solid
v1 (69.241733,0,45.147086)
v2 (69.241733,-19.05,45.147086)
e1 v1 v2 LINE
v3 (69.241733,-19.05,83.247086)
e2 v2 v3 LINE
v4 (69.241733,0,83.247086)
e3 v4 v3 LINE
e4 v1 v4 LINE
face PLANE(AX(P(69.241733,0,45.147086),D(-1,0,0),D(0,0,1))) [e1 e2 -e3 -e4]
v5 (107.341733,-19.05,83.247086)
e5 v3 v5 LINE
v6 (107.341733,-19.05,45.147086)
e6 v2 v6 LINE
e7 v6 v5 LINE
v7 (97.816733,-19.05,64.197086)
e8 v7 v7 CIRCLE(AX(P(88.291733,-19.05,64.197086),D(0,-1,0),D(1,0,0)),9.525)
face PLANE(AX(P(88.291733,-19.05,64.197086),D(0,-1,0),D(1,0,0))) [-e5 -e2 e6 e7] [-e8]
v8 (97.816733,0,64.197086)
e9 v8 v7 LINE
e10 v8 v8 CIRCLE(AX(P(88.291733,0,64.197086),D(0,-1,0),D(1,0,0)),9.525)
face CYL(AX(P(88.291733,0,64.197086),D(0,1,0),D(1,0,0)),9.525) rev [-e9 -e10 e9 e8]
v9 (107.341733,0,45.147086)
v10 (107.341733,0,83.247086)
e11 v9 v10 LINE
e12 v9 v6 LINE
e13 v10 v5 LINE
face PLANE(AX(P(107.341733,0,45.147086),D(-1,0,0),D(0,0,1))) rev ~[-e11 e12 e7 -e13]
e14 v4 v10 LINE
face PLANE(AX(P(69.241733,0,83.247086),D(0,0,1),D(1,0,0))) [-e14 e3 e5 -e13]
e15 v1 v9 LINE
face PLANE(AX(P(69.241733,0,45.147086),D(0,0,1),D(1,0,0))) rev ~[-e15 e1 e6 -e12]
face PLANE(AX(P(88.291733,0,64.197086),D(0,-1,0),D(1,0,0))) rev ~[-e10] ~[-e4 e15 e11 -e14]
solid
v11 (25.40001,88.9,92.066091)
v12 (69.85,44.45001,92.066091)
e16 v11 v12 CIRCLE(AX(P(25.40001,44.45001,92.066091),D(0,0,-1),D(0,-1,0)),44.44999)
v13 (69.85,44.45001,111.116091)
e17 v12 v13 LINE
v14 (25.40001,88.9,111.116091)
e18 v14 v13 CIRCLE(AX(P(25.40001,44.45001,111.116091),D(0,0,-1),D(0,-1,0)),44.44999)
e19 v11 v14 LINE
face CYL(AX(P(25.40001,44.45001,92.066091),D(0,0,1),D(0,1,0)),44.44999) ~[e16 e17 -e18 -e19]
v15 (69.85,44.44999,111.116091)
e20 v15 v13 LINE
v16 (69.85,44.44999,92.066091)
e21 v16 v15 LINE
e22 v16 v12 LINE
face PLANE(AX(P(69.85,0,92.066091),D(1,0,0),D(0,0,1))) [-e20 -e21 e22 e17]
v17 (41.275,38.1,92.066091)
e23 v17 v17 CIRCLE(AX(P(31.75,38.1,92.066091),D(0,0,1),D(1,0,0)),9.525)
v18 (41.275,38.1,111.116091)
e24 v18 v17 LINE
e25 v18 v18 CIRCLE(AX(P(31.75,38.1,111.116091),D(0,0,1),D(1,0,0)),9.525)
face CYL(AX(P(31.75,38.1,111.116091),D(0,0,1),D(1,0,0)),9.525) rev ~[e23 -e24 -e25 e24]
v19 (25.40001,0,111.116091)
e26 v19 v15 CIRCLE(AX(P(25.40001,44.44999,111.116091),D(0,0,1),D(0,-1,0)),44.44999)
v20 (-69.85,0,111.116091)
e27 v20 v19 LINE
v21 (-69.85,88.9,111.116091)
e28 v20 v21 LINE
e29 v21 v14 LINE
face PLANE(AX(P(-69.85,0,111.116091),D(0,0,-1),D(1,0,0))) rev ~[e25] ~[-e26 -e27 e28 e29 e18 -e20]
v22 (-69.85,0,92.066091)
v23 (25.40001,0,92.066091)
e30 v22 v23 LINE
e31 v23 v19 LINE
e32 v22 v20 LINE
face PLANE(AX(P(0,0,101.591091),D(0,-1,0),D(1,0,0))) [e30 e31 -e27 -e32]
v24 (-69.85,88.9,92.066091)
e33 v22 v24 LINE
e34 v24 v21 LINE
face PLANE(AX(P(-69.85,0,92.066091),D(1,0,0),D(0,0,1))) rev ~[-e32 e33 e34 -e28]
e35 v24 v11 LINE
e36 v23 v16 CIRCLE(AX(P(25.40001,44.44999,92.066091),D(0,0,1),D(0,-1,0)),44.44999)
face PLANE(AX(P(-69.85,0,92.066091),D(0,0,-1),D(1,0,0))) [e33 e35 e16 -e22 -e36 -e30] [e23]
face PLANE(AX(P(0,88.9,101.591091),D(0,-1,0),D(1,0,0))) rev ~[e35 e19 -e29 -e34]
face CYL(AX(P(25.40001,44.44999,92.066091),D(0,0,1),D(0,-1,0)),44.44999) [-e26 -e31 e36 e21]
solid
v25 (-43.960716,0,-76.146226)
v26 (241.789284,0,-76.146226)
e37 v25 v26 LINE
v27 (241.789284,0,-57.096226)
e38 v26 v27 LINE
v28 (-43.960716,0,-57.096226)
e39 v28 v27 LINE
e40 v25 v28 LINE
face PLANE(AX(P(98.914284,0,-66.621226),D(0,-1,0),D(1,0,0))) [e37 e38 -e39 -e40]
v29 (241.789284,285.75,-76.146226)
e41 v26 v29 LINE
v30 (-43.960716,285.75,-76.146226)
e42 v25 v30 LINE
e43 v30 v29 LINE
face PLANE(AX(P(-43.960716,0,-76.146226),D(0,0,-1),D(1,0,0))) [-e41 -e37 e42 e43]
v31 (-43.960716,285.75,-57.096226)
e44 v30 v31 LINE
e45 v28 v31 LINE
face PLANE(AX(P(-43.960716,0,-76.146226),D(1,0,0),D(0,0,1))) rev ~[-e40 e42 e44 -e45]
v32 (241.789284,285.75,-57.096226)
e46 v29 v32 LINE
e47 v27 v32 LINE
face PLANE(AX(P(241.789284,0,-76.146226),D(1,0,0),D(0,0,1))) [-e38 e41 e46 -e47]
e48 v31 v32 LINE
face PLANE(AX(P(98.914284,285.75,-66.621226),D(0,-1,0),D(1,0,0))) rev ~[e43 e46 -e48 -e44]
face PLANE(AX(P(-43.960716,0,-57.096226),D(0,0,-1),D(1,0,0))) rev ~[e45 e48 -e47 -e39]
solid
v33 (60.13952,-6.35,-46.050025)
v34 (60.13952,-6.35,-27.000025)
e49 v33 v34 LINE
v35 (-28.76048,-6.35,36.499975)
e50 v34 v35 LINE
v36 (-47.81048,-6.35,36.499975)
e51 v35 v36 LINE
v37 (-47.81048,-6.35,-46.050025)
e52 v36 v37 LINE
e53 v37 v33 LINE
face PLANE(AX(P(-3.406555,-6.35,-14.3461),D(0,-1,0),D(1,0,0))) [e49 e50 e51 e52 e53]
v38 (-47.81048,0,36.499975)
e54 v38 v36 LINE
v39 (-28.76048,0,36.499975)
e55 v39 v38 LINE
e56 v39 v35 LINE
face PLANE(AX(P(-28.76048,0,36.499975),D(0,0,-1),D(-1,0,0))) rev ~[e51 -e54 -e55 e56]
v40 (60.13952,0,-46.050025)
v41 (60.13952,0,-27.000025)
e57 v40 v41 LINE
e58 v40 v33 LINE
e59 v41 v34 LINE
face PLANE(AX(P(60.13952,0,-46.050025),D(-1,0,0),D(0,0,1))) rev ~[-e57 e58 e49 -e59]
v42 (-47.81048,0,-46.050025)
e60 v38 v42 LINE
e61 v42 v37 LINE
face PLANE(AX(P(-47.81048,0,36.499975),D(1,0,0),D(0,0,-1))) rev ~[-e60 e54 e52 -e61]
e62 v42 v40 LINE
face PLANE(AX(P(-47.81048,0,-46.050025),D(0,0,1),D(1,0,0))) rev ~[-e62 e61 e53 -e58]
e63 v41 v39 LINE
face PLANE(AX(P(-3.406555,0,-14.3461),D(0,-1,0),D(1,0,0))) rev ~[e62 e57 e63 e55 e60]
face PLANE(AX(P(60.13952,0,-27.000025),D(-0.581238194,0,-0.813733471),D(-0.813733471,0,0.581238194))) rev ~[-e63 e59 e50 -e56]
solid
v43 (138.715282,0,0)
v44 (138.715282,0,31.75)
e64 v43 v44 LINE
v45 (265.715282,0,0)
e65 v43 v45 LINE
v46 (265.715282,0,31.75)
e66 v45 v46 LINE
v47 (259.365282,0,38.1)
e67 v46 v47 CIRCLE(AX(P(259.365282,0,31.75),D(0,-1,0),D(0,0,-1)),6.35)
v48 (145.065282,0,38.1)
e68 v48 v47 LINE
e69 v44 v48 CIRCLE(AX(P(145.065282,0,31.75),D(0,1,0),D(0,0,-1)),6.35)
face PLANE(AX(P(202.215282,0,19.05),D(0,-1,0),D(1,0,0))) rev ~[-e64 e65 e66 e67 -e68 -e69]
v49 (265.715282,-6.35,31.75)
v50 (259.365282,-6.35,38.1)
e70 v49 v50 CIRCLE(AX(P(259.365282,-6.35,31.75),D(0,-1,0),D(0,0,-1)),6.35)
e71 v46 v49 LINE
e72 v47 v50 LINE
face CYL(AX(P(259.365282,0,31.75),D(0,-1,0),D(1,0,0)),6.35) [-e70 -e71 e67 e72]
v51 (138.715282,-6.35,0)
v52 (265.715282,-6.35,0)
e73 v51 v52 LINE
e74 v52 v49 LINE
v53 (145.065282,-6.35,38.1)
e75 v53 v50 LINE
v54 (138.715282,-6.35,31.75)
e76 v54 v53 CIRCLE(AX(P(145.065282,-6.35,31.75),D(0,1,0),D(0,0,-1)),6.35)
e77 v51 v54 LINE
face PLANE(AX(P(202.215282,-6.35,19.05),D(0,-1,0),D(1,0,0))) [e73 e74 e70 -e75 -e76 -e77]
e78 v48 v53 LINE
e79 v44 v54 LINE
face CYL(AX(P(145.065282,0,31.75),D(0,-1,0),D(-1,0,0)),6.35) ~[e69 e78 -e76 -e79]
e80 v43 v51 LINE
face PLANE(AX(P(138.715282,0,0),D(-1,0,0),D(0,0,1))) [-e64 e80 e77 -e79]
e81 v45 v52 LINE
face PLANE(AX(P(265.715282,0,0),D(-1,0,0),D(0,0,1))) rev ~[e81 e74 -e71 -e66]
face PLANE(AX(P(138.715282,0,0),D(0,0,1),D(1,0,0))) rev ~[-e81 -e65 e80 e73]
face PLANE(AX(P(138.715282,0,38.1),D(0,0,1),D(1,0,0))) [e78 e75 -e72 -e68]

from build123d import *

# Parameters (mm, degrees)
F1_DEPTH  = 6.35
F0_W      = 127
F0_H      = 38.1
F2_R      = 6.35
F3_W      = 285.75
F3_H      = 19.05
F4_DEPTH  = 285.75
F5_W      = 38.1
F5_H      = 38.1
F5_R      = 9.525
F6_DEPTH  = 19.05
F7_W      = 139.7
F7_H      = 19.05
F8_DEPTH  = 88.9
F9_R      = 9.525
F10_DEPTH = 50.8
F11_R     = 44.44999


# Not quite as in the source:
# - a fillet or chamfer is up to 0.001 mm smaller than in the source, because OpenCascade refuses the exact size


with BuildPart() as f1:
    # F0 (on Front) → F1 (new body)
    with BuildSketch(Plane.XZ):
        Polygon((-28.7604803375, 36.4999751758), (-47.8104803375, 36.4999751758), (-47.8104803375, -46.0500248242), (60.1395196625, -46.0500248242), (60.1395196625, -27.0000248242), align=None)
    extrude(amount=F1_DEPTH)


with BuildPart() as f1b:
    # F0 (on Front) → F1, piece 2 (new body)
    with BuildSketch(Plane.XZ):
        with Locations((202.2152820826, 19.05)):
            Rectangle(F0_W, F0_H)
    extrude(amount=F1_DEPTH)

    # F2
    f2_edges = [f1b.edges().sort_by_distance(p)[0] for p in [
        (138.715282, -3.175, 38.1),
        (265.715282, -3.175, 38.1),
    ]]
    fillet(f2_edges, radius=F2_R)


with BuildPart() as f4:
    # F3 (on Front) → F4 (new body)
    with BuildSketch(Plane.XZ):
        with Locations((98.9142842591, -66.6212261169)):
            Rectangle(F3_W, F3_H)
    extrude(amount=-F4_DEPTH)


with BuildPart() as f6:
    # F5 (on Front) → F6 (new body)
    with BuildSketch(Plane.XZ):
        with Locations((88.29173321, 64.1970857978)):
            Rectangle(F5_W, F5_H)
        with Locations((88.29173321, 64.1970857978)):
            Circle(F5_R, mode=Mode.SUBTRACT)
    extrude(amount=F6_DEPTH)


with BuildPart() as f8:
    # F7 (on Front) → F8 (new body)
    with BuildSketch(Plane.XZ):
        with Locations((0, 101.5910909008)):
            Rectangle(F7_W, F7_H)
    extrude(amount=-F8_DEPTH)

    # F9 (on face) → F10 (cut)
    with BuildSketch(Plane.XY.offset(111.1160909008)):
        with Locations((31.75, 38.1)):
            Circle(F9_R)
    extrude(amount=-F10_DEPTH, mode=Mode.SUBTRACT)

    # F11 (radius 44.45 in the source; OpenCascade refuses exactly that, so slightly less here)
    f11_edges = [f8.edges().sort_by_distance(p)[0] for p in [
        (69.85, 0, 101.591091),
        (69.85, 88.9, 101.591091),
    ]]
    fillet(f11_edges, radius=F11_R)


solid = Compound([f1.part, f1b.part, f4.part, f6.part, f8.part])
